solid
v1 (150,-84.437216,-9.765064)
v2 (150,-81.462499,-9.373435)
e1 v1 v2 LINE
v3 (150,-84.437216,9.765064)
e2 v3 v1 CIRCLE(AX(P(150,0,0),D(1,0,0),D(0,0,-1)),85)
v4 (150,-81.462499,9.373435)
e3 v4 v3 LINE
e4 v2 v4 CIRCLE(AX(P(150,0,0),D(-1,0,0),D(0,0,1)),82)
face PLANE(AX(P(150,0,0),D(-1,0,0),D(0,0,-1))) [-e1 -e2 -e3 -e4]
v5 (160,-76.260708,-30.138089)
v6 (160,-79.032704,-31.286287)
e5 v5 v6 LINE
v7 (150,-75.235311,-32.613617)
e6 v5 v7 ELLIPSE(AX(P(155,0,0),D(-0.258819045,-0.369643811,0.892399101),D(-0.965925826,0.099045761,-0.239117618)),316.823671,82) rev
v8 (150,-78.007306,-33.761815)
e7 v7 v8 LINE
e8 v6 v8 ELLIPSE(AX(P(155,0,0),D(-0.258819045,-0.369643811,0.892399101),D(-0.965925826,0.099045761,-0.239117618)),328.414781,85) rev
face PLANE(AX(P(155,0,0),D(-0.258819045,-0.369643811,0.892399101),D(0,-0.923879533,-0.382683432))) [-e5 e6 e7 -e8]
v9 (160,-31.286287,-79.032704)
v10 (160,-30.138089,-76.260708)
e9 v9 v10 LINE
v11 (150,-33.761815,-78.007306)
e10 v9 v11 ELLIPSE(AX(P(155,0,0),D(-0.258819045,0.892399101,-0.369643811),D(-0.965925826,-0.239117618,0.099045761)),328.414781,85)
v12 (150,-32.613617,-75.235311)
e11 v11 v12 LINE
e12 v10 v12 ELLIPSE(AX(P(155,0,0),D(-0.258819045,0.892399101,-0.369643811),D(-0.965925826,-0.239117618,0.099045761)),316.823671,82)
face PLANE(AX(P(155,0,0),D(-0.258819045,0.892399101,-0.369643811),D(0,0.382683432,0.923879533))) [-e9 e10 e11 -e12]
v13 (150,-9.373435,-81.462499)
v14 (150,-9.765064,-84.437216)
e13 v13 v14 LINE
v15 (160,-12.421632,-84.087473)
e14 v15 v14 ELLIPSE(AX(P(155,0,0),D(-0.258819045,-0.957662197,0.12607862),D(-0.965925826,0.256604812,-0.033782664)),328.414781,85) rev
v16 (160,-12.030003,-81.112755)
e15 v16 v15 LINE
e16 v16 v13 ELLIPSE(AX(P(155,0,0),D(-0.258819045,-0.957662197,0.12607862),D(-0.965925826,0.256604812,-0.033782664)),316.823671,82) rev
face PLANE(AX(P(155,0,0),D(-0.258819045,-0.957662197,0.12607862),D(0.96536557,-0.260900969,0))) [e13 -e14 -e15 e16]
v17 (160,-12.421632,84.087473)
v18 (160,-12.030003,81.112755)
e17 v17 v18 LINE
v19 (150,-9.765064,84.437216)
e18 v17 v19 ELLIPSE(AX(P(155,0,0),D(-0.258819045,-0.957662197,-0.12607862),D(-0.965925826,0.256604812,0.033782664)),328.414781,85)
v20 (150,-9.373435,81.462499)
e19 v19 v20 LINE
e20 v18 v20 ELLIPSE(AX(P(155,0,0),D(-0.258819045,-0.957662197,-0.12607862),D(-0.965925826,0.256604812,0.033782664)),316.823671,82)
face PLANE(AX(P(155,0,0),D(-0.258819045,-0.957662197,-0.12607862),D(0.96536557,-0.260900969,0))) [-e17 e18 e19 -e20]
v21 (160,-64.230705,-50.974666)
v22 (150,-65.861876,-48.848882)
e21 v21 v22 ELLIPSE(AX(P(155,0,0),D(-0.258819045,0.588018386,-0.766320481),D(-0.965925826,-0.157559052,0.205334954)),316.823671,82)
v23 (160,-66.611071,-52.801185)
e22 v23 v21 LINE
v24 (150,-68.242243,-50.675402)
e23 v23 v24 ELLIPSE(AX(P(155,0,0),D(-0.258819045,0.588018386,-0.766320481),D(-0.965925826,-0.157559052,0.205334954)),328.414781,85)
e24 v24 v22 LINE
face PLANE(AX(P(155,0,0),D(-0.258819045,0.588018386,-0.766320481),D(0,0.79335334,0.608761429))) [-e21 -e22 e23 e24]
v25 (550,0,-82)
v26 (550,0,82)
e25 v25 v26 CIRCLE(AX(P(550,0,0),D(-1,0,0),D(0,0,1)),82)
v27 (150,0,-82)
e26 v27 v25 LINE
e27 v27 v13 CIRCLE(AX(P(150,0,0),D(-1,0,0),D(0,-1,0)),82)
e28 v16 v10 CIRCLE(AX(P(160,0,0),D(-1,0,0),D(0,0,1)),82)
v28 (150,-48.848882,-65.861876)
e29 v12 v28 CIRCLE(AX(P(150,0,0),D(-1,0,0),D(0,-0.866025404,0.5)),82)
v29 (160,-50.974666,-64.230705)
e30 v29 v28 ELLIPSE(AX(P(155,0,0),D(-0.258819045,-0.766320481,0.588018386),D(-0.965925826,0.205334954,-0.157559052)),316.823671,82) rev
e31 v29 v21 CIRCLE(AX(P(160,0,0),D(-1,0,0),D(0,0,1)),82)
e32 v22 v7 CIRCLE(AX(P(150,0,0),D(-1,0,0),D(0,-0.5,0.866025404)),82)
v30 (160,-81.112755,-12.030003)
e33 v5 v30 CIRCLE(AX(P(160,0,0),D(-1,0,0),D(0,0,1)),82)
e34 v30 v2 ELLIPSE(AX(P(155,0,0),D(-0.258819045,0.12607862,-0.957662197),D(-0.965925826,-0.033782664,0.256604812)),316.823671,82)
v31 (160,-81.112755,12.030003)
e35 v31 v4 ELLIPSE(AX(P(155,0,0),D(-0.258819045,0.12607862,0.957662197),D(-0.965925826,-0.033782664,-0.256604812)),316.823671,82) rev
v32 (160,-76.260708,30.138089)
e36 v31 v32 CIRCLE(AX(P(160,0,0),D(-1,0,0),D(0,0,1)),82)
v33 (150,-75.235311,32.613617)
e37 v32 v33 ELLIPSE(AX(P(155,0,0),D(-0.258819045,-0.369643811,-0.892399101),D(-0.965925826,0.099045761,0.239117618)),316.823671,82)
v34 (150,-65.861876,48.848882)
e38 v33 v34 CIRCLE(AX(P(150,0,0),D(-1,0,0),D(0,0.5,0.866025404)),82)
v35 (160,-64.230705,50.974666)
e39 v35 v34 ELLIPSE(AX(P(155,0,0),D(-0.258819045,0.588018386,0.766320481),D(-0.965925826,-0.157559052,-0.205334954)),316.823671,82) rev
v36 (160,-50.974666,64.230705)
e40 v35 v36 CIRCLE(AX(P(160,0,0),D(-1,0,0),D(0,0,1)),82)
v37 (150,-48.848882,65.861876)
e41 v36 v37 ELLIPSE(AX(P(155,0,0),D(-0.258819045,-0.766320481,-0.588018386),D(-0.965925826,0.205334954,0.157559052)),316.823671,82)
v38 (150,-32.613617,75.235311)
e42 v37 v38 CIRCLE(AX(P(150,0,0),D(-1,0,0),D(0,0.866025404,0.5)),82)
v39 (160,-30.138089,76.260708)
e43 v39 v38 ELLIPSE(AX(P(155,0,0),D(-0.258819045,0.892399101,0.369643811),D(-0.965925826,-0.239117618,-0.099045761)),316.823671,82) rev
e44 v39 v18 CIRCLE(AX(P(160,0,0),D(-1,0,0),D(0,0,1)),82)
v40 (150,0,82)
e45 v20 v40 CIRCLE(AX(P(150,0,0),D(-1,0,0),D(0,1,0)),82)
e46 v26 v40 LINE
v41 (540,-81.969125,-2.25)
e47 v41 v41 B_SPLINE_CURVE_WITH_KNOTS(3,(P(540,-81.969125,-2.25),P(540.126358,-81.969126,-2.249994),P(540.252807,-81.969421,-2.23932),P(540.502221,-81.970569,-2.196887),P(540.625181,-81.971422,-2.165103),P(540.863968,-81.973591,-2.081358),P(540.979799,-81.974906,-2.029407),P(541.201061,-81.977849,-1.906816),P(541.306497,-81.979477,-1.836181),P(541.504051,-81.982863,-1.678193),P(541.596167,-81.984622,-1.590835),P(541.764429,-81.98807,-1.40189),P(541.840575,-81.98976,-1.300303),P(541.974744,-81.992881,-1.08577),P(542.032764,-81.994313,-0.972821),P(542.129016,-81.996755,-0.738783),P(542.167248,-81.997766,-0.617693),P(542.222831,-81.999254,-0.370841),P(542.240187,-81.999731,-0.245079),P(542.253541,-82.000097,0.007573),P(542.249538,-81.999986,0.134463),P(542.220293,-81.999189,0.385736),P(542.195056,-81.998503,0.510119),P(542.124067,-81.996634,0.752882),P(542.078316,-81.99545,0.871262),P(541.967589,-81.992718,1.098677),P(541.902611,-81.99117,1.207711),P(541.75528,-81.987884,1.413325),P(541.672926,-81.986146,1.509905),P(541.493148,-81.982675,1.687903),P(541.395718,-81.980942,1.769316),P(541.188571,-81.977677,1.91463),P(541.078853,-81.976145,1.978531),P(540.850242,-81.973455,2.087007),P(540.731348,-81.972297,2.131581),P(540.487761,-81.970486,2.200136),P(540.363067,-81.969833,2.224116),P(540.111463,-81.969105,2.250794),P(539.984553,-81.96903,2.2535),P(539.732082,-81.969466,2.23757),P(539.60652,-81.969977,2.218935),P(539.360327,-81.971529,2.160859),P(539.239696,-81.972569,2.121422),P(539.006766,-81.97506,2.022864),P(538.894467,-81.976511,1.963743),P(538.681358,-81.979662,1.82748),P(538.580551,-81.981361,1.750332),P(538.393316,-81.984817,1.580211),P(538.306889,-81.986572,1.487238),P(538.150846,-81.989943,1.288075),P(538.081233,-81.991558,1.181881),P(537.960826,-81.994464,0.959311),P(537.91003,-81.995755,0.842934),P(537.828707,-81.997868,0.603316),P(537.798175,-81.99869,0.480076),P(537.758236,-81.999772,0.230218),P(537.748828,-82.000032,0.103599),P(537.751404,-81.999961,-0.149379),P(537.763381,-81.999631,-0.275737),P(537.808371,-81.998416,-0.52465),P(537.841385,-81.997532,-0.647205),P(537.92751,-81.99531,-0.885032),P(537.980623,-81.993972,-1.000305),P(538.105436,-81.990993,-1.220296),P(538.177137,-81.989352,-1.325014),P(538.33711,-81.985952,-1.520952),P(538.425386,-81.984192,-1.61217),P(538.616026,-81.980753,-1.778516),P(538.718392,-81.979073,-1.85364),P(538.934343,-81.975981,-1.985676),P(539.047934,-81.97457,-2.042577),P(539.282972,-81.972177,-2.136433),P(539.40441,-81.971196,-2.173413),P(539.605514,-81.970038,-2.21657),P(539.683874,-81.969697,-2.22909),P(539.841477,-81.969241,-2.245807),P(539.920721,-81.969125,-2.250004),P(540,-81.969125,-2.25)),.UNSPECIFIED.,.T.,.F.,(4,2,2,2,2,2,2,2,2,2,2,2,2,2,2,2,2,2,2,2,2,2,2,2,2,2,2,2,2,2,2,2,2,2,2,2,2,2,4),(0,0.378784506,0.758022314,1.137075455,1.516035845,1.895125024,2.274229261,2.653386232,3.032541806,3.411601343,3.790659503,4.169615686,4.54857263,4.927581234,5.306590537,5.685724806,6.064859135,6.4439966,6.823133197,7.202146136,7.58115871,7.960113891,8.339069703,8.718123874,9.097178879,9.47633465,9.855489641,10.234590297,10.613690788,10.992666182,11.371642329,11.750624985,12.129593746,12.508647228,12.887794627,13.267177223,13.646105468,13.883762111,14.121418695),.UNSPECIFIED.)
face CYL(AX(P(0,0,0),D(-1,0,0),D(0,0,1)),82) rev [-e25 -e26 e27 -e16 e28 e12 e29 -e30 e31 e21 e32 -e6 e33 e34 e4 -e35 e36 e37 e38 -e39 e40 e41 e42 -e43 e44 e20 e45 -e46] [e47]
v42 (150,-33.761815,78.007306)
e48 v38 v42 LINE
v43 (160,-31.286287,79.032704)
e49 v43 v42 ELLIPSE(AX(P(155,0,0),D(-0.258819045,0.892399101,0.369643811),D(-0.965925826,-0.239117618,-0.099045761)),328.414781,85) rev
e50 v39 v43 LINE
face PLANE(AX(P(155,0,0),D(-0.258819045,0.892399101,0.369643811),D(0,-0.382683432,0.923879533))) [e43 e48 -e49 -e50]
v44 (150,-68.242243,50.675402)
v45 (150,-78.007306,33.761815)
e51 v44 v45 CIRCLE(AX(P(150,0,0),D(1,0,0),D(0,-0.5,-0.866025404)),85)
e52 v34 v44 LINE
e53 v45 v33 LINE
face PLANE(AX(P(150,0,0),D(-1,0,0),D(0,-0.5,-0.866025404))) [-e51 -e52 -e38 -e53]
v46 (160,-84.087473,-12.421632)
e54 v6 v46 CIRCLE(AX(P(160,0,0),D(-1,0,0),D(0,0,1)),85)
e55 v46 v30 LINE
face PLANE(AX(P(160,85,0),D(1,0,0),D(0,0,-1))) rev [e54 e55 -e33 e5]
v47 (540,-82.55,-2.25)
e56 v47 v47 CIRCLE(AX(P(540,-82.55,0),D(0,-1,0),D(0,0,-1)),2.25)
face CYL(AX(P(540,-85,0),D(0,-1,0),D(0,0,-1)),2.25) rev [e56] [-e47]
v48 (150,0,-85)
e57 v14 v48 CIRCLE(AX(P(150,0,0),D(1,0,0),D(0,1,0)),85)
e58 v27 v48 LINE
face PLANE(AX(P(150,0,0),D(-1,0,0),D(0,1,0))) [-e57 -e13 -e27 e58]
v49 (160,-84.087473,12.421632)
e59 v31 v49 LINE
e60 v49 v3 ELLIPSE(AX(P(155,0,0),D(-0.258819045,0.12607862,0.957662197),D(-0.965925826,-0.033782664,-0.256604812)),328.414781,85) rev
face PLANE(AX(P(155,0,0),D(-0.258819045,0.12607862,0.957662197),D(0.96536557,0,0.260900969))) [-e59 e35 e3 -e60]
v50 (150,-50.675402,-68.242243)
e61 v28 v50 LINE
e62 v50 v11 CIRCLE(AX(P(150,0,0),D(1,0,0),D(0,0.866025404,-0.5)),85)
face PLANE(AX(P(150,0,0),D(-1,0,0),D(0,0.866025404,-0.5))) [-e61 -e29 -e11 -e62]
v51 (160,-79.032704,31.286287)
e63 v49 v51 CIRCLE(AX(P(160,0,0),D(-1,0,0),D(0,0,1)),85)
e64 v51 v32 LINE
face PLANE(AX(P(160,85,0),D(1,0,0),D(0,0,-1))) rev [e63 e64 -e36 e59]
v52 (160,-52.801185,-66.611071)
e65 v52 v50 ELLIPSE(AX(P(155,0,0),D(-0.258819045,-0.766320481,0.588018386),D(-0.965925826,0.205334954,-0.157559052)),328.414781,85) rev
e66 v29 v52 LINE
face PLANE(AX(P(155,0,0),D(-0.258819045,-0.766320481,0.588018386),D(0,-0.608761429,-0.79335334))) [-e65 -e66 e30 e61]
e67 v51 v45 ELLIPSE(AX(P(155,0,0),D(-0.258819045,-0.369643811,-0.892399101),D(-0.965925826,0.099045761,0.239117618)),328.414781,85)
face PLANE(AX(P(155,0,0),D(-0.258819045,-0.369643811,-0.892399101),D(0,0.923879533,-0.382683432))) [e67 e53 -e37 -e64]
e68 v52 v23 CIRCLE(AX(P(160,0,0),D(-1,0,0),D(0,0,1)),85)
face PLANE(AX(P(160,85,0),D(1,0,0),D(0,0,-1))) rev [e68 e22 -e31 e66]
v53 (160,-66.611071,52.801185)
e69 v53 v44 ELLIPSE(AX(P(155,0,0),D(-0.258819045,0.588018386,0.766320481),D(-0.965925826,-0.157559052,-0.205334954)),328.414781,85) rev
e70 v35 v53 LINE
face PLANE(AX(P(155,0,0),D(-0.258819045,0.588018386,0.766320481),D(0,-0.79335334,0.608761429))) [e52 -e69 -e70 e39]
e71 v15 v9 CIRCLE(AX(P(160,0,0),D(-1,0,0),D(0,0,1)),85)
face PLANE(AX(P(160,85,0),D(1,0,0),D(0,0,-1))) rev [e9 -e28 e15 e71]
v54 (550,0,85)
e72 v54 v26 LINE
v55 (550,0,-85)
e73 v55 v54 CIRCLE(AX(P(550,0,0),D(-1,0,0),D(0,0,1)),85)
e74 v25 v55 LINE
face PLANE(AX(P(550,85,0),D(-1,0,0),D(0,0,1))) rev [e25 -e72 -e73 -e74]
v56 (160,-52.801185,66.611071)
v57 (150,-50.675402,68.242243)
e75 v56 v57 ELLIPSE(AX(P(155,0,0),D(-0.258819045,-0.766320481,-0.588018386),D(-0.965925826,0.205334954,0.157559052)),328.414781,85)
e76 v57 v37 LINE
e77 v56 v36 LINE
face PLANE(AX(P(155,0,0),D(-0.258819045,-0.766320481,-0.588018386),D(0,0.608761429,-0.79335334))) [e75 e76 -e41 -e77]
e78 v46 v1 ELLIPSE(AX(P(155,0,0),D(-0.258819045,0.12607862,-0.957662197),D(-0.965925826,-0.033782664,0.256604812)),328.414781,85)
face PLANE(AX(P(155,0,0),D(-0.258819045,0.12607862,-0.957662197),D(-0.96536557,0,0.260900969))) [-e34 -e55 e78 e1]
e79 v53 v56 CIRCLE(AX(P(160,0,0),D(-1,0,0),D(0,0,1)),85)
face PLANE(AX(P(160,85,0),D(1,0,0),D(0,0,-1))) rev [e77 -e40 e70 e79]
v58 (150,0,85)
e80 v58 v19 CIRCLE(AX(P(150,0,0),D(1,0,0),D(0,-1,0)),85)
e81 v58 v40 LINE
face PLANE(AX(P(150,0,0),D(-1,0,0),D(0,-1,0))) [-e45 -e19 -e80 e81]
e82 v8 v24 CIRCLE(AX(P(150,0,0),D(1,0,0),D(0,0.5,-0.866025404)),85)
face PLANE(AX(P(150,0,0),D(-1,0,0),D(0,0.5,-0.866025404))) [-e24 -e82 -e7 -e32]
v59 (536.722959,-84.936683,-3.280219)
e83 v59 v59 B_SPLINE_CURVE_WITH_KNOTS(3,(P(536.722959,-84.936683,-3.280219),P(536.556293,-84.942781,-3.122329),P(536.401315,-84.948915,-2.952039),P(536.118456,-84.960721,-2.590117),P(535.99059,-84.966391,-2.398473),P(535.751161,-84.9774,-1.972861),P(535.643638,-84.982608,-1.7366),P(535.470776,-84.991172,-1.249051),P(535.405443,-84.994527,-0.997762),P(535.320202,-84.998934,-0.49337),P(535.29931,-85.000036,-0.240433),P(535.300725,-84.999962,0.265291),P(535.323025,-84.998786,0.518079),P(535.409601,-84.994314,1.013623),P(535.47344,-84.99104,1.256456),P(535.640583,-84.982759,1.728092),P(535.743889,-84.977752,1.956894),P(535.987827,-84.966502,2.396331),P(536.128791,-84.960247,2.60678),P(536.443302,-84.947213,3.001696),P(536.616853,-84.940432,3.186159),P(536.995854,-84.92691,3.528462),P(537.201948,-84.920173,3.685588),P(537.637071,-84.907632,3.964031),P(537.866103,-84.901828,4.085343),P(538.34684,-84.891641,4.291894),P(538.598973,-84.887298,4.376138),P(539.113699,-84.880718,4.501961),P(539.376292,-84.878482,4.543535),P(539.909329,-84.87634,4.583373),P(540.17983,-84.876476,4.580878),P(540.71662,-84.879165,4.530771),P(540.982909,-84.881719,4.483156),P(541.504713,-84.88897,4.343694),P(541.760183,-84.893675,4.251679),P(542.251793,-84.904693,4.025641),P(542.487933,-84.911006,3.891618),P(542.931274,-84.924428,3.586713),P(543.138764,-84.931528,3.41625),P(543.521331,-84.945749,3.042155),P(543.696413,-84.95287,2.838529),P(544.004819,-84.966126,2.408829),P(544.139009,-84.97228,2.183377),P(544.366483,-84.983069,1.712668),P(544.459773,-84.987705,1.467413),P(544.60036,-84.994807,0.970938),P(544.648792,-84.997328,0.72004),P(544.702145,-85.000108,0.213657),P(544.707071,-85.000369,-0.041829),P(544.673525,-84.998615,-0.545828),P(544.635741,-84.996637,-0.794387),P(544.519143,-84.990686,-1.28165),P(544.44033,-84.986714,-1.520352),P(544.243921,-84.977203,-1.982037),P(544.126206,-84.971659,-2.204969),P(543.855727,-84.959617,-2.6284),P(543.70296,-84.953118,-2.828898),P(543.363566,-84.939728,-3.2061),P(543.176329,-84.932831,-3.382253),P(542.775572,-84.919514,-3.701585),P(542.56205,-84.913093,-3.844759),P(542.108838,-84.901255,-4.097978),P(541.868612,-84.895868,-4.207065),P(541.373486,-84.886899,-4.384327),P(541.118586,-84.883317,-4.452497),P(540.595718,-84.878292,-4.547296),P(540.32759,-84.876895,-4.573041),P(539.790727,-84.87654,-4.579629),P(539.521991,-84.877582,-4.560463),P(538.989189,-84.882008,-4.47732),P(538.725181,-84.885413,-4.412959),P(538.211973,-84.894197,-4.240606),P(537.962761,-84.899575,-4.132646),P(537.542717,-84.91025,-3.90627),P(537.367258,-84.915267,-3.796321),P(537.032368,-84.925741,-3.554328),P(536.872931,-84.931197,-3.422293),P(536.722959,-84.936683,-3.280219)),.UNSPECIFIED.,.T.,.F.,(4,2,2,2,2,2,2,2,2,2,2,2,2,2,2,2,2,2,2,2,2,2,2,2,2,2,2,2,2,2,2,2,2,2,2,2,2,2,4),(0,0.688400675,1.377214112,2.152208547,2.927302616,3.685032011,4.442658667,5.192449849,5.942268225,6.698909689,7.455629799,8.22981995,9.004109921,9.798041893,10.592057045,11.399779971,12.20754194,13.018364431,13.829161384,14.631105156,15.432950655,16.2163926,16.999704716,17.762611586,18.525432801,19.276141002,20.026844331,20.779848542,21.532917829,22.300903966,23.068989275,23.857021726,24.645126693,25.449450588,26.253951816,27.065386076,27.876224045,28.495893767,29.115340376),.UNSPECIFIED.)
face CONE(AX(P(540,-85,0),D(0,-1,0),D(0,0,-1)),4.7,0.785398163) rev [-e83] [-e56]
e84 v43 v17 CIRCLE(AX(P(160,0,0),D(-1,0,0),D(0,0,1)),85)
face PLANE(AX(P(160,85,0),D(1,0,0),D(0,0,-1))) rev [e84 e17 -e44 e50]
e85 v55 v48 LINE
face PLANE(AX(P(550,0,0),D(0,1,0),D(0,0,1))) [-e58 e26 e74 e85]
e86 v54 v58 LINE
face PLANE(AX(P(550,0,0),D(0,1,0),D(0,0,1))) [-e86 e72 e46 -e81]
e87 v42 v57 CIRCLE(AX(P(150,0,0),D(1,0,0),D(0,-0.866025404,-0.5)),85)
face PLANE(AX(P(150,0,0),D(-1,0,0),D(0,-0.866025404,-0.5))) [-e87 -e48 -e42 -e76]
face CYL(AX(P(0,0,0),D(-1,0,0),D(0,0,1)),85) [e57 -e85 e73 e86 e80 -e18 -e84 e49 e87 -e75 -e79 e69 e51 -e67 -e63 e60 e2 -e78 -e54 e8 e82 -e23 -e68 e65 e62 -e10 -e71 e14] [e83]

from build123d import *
from build123d.topology import SkipClean

# Parameters (mm, degrees)
SKETCH1_W                      = 390
SKETCH1_H                      = 3
BOSS_EXTRUDE1_DEPTH            = 5
DRAFT1_ANGLE                   = -15
CIRPATTERN1_COUNT              = 12
DRAFT1_OF_CIRPATTERN1_2_ANGLE  = -15
DRAFT1_OF_CIRPATTERN1_3_ANGLE  = -15
DRAFT1_OF_CIRPATTERN1_4_ANGLE  = -15
DRAFT1_OF_CIRPATTERN1_5_ANGLE  = -15
DRAFT1_OF_CIRPATTERN1_6_ANGLE  = -15
DRAFT1_OF_CIRPATTERN1_7_ANGLE  = -15
DRAFT1_OF_CIRPATTERN1_8_ANGLE  = -15
DRAFT1_OF_CIRPATTERN1_9_ANGLE  = -15
DRAFT1_OF_CIRPATTERN1_10_ANGLE = -15
DRAFT1_OF_CIRPATTERN1_11_ANGLE = -15
DRAFT1_OF_CIRPATTERN1_12_ANGLE = -15
CUT_EXTRUDE1_DEPTH             = 563.983125857


# Read off the part's stored shape, not the designer's step: CSK for M4 Countersunk Flat Head Screw1
with BuildPart() as part:
    # Sketch1 → Revolve1 (revolve)
    with BuildSketch(Plane.XY, mode=Mode.PRIVATE) as revolve1_sk:
        with Locations((355, 83.5)):
            Rectangle(SKETCH1_W, SKETCH1_H)
    revolve(revolve1_sk.sketch.rotate(Axis((0, 0, 0), (1, 0, 0)), 90), axis=Axis((0, 0, 0), (1, 0, 0)))

    # Sketch2 → Boss-Extrude1 (add, symmetric)
    with BuildSketch(Plane(origin=(155, 0, 0), x_dir=(0, 0, -1), z_dir=(1, 0, 0))):
        with BuildLine():
            Line((10.703147762, 81.298478633), (11.094726339, 84.272813217))
            ThreePointArc((11.094726339, 84.272813217), (0, 85), (-11.094726339, 84.272813217))
            Line((-11.094726339, 84.272813217), (-10.703147762, 81.298478633))
            ThreePointArc((-10.703147762, 81.298478633), (0, 82), (10.703147762, 81.298478633))
        make_face()
    boss_extrude1 = extrude(amount=BOSS_EXTRUDE1_DEPTH, both=True)

    # Draft1
    draft1_faces = [part.faces().sort_by_distance(p)[0] for p in [
        (155, 82.785645925, 10.89893705),
        (155, 82.785645925, -10.89893705),
    ]]
    draft(draft1_faces, Plane(origin=(155, 0, 0), x_dir=(0, 0, 1), z_dir=(1, 0, 0)), DRAFT1_ANGLE)

    # CirPattern1: Boss-Extrude1 ×12 about axis
    with SkipClean():  # the faces are left unmerged after this step: merging them gives an invalid solid
        cirpattern1_axis = Axis((0, 0, 0), (1, 0, 0))
        for i in range(1, CIRPATTERN1_COUNT):
            add(boss_extrude1.rotate(cirpattern1_axis, i * 360 / CIRPATTERN1_COUNT))

    # Draft1 of CirPattern1 2
    draft1_of_cirpattern1_2_faces = [part.faces().sort_by_distance(p)[0] for p in [
        (155, 66.245003914, 50.831579322),
        (155, 77.143940965, 31.954066602),
    ]]
    draft(draft1_of_cirpattern1_2_faces, Plane(origin=(155, 0, 0), x_dir=(0, -0.49999999999999994, 0.8660254037844387), z_dir=(1, 0, 0)), DRAFT1_OF_CIRPATTERN1_2_ANGLE)

    # Draft1 of CirPattern1 3
    draft1_of_cirpattern1_3_faces = [part.faces().sort_by_distance(p)[0] for p in [
        (155, 31.954066602, 77.143940965),
        (155, 50.831579322, 66.245003914),
    ]]
    draft(draft1_of_cirpattern1_3_faces, Plane(origin=(155, 0, 0), x_dir=(0, -0.8660254037844386, 0.5000000000000001), z_dir=(1, 0, 0)), DRAFT1_OF_CIRPATTERN1_3_ANGLE)

    # Draft1 of CirPattern1 4
    draft1_of_cirpattern1_4_faces = [part.faces().sort_by_distance(p)[0] for p in [
        (155, -10.89893705, 82.785645925),
        (155, 10.89893705, 82.785645925),
    ]]
    draft(draft1_of_cirpattern1_4_faces, Plane(origin=(155, 0, 0), x_dir=(0, -1, 0), z_dir=(1, 0, 0)), DRAFT1_OF_CIRPATTERN1_4_ANGLE)

    # Draft1 of CirPattern1 5
    draft1_of_cirpattern1_5_faces = [part.faces().sort_by_distance(p)[0] for p in [
        (155, -50.831579322, 66.245003914),
        (155, -31.954066602, 77.143940965),
    ]]
    draft(draft1_of_cirpattern1_5_faces, Plane(origin=(155, 0, 0), x_dir=(0, -0.8660254037844387, -0.4999999999999998), z_dir=(1, 0, 0)), DRAFT1_OF_CIRPATTERN1_5_ANGLE)

    # Draft1 of CirPattern1 6
    draft1_of_cirpattern1_6_faces = [part.faces().sort_by_distance(p)[0] for p in [
        (155, -77.143940965, 31.954066602),
        (155, -66.245003914, 50.831579322),
    ]]
    draft(draft1_of_cirpattern1_6_faces, Plane(origin=(155, 0, 0), x_dir=(0, -0.49999999999999994, -0.8660254037844387), z_dir=(1, 0, 0)), DRAFT1_OF_CIRPATTERN1_6_ANGLE)

    # Draft1 of CirPattern1 7
    draft1_of_cirpattern1_7_faces = [part.faces().sort_by_distance(p)[0] for p in [
        (155, -82.785645925, -10.89893705),
        (155, -82.785645925, 10.89893705),
    ]]
    draft(draft1_of_cirpattern1_7_faces, Plane(origin=(155, 0, 0), x_dir=(0, 0, -1), z_dir=(1, 0, 0)), DRAFT1_OF_CIRPATTERN1_7_ANGLE)

    # Draft1 of CirPattern1 8
    draft1_of_cirpattern1_8_faces = [part.faces().sort_by_distance(p)[0] for p in [
        (155, -66.245003914, -50.831579322),
        (155, -77.143940965, -31.954066602),
    ]]
    draft(draft1_of_cirpattern1_8_faces, Plane(origin=(155, 0, 0), x_dir=(0, 0.5000000000000001, -0.8660254037844386), z_dir=(1, 0, 0)), DRAFT1_OF_CIRPATTERN1_8_ANGLE)

    # Draft1 of CirPattern1 9
    draft1_of_cirpattern1_9_faces = [part.faces().sort_by_distance(p)[0] for p in [
        (155, -31.954066602, -77.143940965),
        (155, -50.831579322, -66.245003914),
    ]]
    draft(draft1_of_cirpattern1_9_faces, Plane(origin=(155, 0, 0), x_dir=(0, 0.8660254037844384, -0.5000000000000004), z_dir=(1, 0, 0)), DRAFT1_OF_CIRPATTERN1_9_ANGLE)

    # Draft1 of CirPattern1 10
    draft1_of_cirpattern1_10_faces = [part.faces().sort_by_distance(p)[0] for p in [
        (155, 10.89893705, -82.785645925),
        (155, -10.89893705, -82.785645925),
    ]]
    draft(draft1_of_cirpattern1_10_faces, Plane.YZ.offset(155), DRAFT1_OF_CIRPATTERN1_10_ANGLE)

    # Draft1 of CirPattern1 11
    draft1_of_cirpattern1_11_faces = [part.faces().sort_by_distance(p)[0] for p in [
        (155, 50.831579322, -66.245003914),
        (155, 31.954066602, -77.143940965),
    ]]
    draft(draft1_of_cirpattern1_11_faces, Plane(origin=(155, 0, 0), x_dir=(0, 0.8660254037844386, 0.5000000000000001), z_dir=(1, 0, 0)), DRAFT1_OF_CIRPATTERN1_11_ANGLE)

    # Draft1 of CirPattern1 12
    draft1_of_cirpattern1_12_faces = [part.faces().sort_by_distance(p)[0] for p in [
        (155, 77.143940965, -31.954066602),
        (155, 66.245003914, -50.831579322),
    ]]
    draft(draft1_of_cirpattern1_12_faces, Plane(origin=(155, 0, 0), x_dir=(0, 0.5000000000000004, 0.8660254037844384), z_dir=(1, 0, 0)), DRAFT1_OF_CIRPATTERN1_12_ANGLE)

    # Sketch3 → Cut-Extrude1 (cut, through all)
    with BuildSketch(Plane(origin=(0, 0, 0), x_dir=(0, 0, -1), z_dir=(1, 0, 0))):
        with BuildLine():
            Line((0, 0), (-85, 0))
            ThreePointArc((-85, 0), (0, 85), (85, 0))
            Line((85, 0), (0, 0))
        make_face()
    extrude(amount=CUT_EXTRUDE1_DEPTH, mode=Mode.SUBTRACT)

    # CSK for M4 Countersunk Flat Head Scr 2 → CSK for M4 Countersunk Flat Head Screw1 (revolve, cut)
    with BuildSketch(Plane(origin=(540, 0, 0), x_dir=(1, 0, 0), z_dir=(0, 0, 1))):
        Polygon((0, -85.000032153), (4.700032153, -85.000032153), (2.25, -82.55), (2.25, -81.96910869), (0, -81.96910869), align=None)
    revolve(axis=Axis((540, 0, 0), (0, 1, 0)), mode=Mode.SUBTRACT)


solid = part.part
